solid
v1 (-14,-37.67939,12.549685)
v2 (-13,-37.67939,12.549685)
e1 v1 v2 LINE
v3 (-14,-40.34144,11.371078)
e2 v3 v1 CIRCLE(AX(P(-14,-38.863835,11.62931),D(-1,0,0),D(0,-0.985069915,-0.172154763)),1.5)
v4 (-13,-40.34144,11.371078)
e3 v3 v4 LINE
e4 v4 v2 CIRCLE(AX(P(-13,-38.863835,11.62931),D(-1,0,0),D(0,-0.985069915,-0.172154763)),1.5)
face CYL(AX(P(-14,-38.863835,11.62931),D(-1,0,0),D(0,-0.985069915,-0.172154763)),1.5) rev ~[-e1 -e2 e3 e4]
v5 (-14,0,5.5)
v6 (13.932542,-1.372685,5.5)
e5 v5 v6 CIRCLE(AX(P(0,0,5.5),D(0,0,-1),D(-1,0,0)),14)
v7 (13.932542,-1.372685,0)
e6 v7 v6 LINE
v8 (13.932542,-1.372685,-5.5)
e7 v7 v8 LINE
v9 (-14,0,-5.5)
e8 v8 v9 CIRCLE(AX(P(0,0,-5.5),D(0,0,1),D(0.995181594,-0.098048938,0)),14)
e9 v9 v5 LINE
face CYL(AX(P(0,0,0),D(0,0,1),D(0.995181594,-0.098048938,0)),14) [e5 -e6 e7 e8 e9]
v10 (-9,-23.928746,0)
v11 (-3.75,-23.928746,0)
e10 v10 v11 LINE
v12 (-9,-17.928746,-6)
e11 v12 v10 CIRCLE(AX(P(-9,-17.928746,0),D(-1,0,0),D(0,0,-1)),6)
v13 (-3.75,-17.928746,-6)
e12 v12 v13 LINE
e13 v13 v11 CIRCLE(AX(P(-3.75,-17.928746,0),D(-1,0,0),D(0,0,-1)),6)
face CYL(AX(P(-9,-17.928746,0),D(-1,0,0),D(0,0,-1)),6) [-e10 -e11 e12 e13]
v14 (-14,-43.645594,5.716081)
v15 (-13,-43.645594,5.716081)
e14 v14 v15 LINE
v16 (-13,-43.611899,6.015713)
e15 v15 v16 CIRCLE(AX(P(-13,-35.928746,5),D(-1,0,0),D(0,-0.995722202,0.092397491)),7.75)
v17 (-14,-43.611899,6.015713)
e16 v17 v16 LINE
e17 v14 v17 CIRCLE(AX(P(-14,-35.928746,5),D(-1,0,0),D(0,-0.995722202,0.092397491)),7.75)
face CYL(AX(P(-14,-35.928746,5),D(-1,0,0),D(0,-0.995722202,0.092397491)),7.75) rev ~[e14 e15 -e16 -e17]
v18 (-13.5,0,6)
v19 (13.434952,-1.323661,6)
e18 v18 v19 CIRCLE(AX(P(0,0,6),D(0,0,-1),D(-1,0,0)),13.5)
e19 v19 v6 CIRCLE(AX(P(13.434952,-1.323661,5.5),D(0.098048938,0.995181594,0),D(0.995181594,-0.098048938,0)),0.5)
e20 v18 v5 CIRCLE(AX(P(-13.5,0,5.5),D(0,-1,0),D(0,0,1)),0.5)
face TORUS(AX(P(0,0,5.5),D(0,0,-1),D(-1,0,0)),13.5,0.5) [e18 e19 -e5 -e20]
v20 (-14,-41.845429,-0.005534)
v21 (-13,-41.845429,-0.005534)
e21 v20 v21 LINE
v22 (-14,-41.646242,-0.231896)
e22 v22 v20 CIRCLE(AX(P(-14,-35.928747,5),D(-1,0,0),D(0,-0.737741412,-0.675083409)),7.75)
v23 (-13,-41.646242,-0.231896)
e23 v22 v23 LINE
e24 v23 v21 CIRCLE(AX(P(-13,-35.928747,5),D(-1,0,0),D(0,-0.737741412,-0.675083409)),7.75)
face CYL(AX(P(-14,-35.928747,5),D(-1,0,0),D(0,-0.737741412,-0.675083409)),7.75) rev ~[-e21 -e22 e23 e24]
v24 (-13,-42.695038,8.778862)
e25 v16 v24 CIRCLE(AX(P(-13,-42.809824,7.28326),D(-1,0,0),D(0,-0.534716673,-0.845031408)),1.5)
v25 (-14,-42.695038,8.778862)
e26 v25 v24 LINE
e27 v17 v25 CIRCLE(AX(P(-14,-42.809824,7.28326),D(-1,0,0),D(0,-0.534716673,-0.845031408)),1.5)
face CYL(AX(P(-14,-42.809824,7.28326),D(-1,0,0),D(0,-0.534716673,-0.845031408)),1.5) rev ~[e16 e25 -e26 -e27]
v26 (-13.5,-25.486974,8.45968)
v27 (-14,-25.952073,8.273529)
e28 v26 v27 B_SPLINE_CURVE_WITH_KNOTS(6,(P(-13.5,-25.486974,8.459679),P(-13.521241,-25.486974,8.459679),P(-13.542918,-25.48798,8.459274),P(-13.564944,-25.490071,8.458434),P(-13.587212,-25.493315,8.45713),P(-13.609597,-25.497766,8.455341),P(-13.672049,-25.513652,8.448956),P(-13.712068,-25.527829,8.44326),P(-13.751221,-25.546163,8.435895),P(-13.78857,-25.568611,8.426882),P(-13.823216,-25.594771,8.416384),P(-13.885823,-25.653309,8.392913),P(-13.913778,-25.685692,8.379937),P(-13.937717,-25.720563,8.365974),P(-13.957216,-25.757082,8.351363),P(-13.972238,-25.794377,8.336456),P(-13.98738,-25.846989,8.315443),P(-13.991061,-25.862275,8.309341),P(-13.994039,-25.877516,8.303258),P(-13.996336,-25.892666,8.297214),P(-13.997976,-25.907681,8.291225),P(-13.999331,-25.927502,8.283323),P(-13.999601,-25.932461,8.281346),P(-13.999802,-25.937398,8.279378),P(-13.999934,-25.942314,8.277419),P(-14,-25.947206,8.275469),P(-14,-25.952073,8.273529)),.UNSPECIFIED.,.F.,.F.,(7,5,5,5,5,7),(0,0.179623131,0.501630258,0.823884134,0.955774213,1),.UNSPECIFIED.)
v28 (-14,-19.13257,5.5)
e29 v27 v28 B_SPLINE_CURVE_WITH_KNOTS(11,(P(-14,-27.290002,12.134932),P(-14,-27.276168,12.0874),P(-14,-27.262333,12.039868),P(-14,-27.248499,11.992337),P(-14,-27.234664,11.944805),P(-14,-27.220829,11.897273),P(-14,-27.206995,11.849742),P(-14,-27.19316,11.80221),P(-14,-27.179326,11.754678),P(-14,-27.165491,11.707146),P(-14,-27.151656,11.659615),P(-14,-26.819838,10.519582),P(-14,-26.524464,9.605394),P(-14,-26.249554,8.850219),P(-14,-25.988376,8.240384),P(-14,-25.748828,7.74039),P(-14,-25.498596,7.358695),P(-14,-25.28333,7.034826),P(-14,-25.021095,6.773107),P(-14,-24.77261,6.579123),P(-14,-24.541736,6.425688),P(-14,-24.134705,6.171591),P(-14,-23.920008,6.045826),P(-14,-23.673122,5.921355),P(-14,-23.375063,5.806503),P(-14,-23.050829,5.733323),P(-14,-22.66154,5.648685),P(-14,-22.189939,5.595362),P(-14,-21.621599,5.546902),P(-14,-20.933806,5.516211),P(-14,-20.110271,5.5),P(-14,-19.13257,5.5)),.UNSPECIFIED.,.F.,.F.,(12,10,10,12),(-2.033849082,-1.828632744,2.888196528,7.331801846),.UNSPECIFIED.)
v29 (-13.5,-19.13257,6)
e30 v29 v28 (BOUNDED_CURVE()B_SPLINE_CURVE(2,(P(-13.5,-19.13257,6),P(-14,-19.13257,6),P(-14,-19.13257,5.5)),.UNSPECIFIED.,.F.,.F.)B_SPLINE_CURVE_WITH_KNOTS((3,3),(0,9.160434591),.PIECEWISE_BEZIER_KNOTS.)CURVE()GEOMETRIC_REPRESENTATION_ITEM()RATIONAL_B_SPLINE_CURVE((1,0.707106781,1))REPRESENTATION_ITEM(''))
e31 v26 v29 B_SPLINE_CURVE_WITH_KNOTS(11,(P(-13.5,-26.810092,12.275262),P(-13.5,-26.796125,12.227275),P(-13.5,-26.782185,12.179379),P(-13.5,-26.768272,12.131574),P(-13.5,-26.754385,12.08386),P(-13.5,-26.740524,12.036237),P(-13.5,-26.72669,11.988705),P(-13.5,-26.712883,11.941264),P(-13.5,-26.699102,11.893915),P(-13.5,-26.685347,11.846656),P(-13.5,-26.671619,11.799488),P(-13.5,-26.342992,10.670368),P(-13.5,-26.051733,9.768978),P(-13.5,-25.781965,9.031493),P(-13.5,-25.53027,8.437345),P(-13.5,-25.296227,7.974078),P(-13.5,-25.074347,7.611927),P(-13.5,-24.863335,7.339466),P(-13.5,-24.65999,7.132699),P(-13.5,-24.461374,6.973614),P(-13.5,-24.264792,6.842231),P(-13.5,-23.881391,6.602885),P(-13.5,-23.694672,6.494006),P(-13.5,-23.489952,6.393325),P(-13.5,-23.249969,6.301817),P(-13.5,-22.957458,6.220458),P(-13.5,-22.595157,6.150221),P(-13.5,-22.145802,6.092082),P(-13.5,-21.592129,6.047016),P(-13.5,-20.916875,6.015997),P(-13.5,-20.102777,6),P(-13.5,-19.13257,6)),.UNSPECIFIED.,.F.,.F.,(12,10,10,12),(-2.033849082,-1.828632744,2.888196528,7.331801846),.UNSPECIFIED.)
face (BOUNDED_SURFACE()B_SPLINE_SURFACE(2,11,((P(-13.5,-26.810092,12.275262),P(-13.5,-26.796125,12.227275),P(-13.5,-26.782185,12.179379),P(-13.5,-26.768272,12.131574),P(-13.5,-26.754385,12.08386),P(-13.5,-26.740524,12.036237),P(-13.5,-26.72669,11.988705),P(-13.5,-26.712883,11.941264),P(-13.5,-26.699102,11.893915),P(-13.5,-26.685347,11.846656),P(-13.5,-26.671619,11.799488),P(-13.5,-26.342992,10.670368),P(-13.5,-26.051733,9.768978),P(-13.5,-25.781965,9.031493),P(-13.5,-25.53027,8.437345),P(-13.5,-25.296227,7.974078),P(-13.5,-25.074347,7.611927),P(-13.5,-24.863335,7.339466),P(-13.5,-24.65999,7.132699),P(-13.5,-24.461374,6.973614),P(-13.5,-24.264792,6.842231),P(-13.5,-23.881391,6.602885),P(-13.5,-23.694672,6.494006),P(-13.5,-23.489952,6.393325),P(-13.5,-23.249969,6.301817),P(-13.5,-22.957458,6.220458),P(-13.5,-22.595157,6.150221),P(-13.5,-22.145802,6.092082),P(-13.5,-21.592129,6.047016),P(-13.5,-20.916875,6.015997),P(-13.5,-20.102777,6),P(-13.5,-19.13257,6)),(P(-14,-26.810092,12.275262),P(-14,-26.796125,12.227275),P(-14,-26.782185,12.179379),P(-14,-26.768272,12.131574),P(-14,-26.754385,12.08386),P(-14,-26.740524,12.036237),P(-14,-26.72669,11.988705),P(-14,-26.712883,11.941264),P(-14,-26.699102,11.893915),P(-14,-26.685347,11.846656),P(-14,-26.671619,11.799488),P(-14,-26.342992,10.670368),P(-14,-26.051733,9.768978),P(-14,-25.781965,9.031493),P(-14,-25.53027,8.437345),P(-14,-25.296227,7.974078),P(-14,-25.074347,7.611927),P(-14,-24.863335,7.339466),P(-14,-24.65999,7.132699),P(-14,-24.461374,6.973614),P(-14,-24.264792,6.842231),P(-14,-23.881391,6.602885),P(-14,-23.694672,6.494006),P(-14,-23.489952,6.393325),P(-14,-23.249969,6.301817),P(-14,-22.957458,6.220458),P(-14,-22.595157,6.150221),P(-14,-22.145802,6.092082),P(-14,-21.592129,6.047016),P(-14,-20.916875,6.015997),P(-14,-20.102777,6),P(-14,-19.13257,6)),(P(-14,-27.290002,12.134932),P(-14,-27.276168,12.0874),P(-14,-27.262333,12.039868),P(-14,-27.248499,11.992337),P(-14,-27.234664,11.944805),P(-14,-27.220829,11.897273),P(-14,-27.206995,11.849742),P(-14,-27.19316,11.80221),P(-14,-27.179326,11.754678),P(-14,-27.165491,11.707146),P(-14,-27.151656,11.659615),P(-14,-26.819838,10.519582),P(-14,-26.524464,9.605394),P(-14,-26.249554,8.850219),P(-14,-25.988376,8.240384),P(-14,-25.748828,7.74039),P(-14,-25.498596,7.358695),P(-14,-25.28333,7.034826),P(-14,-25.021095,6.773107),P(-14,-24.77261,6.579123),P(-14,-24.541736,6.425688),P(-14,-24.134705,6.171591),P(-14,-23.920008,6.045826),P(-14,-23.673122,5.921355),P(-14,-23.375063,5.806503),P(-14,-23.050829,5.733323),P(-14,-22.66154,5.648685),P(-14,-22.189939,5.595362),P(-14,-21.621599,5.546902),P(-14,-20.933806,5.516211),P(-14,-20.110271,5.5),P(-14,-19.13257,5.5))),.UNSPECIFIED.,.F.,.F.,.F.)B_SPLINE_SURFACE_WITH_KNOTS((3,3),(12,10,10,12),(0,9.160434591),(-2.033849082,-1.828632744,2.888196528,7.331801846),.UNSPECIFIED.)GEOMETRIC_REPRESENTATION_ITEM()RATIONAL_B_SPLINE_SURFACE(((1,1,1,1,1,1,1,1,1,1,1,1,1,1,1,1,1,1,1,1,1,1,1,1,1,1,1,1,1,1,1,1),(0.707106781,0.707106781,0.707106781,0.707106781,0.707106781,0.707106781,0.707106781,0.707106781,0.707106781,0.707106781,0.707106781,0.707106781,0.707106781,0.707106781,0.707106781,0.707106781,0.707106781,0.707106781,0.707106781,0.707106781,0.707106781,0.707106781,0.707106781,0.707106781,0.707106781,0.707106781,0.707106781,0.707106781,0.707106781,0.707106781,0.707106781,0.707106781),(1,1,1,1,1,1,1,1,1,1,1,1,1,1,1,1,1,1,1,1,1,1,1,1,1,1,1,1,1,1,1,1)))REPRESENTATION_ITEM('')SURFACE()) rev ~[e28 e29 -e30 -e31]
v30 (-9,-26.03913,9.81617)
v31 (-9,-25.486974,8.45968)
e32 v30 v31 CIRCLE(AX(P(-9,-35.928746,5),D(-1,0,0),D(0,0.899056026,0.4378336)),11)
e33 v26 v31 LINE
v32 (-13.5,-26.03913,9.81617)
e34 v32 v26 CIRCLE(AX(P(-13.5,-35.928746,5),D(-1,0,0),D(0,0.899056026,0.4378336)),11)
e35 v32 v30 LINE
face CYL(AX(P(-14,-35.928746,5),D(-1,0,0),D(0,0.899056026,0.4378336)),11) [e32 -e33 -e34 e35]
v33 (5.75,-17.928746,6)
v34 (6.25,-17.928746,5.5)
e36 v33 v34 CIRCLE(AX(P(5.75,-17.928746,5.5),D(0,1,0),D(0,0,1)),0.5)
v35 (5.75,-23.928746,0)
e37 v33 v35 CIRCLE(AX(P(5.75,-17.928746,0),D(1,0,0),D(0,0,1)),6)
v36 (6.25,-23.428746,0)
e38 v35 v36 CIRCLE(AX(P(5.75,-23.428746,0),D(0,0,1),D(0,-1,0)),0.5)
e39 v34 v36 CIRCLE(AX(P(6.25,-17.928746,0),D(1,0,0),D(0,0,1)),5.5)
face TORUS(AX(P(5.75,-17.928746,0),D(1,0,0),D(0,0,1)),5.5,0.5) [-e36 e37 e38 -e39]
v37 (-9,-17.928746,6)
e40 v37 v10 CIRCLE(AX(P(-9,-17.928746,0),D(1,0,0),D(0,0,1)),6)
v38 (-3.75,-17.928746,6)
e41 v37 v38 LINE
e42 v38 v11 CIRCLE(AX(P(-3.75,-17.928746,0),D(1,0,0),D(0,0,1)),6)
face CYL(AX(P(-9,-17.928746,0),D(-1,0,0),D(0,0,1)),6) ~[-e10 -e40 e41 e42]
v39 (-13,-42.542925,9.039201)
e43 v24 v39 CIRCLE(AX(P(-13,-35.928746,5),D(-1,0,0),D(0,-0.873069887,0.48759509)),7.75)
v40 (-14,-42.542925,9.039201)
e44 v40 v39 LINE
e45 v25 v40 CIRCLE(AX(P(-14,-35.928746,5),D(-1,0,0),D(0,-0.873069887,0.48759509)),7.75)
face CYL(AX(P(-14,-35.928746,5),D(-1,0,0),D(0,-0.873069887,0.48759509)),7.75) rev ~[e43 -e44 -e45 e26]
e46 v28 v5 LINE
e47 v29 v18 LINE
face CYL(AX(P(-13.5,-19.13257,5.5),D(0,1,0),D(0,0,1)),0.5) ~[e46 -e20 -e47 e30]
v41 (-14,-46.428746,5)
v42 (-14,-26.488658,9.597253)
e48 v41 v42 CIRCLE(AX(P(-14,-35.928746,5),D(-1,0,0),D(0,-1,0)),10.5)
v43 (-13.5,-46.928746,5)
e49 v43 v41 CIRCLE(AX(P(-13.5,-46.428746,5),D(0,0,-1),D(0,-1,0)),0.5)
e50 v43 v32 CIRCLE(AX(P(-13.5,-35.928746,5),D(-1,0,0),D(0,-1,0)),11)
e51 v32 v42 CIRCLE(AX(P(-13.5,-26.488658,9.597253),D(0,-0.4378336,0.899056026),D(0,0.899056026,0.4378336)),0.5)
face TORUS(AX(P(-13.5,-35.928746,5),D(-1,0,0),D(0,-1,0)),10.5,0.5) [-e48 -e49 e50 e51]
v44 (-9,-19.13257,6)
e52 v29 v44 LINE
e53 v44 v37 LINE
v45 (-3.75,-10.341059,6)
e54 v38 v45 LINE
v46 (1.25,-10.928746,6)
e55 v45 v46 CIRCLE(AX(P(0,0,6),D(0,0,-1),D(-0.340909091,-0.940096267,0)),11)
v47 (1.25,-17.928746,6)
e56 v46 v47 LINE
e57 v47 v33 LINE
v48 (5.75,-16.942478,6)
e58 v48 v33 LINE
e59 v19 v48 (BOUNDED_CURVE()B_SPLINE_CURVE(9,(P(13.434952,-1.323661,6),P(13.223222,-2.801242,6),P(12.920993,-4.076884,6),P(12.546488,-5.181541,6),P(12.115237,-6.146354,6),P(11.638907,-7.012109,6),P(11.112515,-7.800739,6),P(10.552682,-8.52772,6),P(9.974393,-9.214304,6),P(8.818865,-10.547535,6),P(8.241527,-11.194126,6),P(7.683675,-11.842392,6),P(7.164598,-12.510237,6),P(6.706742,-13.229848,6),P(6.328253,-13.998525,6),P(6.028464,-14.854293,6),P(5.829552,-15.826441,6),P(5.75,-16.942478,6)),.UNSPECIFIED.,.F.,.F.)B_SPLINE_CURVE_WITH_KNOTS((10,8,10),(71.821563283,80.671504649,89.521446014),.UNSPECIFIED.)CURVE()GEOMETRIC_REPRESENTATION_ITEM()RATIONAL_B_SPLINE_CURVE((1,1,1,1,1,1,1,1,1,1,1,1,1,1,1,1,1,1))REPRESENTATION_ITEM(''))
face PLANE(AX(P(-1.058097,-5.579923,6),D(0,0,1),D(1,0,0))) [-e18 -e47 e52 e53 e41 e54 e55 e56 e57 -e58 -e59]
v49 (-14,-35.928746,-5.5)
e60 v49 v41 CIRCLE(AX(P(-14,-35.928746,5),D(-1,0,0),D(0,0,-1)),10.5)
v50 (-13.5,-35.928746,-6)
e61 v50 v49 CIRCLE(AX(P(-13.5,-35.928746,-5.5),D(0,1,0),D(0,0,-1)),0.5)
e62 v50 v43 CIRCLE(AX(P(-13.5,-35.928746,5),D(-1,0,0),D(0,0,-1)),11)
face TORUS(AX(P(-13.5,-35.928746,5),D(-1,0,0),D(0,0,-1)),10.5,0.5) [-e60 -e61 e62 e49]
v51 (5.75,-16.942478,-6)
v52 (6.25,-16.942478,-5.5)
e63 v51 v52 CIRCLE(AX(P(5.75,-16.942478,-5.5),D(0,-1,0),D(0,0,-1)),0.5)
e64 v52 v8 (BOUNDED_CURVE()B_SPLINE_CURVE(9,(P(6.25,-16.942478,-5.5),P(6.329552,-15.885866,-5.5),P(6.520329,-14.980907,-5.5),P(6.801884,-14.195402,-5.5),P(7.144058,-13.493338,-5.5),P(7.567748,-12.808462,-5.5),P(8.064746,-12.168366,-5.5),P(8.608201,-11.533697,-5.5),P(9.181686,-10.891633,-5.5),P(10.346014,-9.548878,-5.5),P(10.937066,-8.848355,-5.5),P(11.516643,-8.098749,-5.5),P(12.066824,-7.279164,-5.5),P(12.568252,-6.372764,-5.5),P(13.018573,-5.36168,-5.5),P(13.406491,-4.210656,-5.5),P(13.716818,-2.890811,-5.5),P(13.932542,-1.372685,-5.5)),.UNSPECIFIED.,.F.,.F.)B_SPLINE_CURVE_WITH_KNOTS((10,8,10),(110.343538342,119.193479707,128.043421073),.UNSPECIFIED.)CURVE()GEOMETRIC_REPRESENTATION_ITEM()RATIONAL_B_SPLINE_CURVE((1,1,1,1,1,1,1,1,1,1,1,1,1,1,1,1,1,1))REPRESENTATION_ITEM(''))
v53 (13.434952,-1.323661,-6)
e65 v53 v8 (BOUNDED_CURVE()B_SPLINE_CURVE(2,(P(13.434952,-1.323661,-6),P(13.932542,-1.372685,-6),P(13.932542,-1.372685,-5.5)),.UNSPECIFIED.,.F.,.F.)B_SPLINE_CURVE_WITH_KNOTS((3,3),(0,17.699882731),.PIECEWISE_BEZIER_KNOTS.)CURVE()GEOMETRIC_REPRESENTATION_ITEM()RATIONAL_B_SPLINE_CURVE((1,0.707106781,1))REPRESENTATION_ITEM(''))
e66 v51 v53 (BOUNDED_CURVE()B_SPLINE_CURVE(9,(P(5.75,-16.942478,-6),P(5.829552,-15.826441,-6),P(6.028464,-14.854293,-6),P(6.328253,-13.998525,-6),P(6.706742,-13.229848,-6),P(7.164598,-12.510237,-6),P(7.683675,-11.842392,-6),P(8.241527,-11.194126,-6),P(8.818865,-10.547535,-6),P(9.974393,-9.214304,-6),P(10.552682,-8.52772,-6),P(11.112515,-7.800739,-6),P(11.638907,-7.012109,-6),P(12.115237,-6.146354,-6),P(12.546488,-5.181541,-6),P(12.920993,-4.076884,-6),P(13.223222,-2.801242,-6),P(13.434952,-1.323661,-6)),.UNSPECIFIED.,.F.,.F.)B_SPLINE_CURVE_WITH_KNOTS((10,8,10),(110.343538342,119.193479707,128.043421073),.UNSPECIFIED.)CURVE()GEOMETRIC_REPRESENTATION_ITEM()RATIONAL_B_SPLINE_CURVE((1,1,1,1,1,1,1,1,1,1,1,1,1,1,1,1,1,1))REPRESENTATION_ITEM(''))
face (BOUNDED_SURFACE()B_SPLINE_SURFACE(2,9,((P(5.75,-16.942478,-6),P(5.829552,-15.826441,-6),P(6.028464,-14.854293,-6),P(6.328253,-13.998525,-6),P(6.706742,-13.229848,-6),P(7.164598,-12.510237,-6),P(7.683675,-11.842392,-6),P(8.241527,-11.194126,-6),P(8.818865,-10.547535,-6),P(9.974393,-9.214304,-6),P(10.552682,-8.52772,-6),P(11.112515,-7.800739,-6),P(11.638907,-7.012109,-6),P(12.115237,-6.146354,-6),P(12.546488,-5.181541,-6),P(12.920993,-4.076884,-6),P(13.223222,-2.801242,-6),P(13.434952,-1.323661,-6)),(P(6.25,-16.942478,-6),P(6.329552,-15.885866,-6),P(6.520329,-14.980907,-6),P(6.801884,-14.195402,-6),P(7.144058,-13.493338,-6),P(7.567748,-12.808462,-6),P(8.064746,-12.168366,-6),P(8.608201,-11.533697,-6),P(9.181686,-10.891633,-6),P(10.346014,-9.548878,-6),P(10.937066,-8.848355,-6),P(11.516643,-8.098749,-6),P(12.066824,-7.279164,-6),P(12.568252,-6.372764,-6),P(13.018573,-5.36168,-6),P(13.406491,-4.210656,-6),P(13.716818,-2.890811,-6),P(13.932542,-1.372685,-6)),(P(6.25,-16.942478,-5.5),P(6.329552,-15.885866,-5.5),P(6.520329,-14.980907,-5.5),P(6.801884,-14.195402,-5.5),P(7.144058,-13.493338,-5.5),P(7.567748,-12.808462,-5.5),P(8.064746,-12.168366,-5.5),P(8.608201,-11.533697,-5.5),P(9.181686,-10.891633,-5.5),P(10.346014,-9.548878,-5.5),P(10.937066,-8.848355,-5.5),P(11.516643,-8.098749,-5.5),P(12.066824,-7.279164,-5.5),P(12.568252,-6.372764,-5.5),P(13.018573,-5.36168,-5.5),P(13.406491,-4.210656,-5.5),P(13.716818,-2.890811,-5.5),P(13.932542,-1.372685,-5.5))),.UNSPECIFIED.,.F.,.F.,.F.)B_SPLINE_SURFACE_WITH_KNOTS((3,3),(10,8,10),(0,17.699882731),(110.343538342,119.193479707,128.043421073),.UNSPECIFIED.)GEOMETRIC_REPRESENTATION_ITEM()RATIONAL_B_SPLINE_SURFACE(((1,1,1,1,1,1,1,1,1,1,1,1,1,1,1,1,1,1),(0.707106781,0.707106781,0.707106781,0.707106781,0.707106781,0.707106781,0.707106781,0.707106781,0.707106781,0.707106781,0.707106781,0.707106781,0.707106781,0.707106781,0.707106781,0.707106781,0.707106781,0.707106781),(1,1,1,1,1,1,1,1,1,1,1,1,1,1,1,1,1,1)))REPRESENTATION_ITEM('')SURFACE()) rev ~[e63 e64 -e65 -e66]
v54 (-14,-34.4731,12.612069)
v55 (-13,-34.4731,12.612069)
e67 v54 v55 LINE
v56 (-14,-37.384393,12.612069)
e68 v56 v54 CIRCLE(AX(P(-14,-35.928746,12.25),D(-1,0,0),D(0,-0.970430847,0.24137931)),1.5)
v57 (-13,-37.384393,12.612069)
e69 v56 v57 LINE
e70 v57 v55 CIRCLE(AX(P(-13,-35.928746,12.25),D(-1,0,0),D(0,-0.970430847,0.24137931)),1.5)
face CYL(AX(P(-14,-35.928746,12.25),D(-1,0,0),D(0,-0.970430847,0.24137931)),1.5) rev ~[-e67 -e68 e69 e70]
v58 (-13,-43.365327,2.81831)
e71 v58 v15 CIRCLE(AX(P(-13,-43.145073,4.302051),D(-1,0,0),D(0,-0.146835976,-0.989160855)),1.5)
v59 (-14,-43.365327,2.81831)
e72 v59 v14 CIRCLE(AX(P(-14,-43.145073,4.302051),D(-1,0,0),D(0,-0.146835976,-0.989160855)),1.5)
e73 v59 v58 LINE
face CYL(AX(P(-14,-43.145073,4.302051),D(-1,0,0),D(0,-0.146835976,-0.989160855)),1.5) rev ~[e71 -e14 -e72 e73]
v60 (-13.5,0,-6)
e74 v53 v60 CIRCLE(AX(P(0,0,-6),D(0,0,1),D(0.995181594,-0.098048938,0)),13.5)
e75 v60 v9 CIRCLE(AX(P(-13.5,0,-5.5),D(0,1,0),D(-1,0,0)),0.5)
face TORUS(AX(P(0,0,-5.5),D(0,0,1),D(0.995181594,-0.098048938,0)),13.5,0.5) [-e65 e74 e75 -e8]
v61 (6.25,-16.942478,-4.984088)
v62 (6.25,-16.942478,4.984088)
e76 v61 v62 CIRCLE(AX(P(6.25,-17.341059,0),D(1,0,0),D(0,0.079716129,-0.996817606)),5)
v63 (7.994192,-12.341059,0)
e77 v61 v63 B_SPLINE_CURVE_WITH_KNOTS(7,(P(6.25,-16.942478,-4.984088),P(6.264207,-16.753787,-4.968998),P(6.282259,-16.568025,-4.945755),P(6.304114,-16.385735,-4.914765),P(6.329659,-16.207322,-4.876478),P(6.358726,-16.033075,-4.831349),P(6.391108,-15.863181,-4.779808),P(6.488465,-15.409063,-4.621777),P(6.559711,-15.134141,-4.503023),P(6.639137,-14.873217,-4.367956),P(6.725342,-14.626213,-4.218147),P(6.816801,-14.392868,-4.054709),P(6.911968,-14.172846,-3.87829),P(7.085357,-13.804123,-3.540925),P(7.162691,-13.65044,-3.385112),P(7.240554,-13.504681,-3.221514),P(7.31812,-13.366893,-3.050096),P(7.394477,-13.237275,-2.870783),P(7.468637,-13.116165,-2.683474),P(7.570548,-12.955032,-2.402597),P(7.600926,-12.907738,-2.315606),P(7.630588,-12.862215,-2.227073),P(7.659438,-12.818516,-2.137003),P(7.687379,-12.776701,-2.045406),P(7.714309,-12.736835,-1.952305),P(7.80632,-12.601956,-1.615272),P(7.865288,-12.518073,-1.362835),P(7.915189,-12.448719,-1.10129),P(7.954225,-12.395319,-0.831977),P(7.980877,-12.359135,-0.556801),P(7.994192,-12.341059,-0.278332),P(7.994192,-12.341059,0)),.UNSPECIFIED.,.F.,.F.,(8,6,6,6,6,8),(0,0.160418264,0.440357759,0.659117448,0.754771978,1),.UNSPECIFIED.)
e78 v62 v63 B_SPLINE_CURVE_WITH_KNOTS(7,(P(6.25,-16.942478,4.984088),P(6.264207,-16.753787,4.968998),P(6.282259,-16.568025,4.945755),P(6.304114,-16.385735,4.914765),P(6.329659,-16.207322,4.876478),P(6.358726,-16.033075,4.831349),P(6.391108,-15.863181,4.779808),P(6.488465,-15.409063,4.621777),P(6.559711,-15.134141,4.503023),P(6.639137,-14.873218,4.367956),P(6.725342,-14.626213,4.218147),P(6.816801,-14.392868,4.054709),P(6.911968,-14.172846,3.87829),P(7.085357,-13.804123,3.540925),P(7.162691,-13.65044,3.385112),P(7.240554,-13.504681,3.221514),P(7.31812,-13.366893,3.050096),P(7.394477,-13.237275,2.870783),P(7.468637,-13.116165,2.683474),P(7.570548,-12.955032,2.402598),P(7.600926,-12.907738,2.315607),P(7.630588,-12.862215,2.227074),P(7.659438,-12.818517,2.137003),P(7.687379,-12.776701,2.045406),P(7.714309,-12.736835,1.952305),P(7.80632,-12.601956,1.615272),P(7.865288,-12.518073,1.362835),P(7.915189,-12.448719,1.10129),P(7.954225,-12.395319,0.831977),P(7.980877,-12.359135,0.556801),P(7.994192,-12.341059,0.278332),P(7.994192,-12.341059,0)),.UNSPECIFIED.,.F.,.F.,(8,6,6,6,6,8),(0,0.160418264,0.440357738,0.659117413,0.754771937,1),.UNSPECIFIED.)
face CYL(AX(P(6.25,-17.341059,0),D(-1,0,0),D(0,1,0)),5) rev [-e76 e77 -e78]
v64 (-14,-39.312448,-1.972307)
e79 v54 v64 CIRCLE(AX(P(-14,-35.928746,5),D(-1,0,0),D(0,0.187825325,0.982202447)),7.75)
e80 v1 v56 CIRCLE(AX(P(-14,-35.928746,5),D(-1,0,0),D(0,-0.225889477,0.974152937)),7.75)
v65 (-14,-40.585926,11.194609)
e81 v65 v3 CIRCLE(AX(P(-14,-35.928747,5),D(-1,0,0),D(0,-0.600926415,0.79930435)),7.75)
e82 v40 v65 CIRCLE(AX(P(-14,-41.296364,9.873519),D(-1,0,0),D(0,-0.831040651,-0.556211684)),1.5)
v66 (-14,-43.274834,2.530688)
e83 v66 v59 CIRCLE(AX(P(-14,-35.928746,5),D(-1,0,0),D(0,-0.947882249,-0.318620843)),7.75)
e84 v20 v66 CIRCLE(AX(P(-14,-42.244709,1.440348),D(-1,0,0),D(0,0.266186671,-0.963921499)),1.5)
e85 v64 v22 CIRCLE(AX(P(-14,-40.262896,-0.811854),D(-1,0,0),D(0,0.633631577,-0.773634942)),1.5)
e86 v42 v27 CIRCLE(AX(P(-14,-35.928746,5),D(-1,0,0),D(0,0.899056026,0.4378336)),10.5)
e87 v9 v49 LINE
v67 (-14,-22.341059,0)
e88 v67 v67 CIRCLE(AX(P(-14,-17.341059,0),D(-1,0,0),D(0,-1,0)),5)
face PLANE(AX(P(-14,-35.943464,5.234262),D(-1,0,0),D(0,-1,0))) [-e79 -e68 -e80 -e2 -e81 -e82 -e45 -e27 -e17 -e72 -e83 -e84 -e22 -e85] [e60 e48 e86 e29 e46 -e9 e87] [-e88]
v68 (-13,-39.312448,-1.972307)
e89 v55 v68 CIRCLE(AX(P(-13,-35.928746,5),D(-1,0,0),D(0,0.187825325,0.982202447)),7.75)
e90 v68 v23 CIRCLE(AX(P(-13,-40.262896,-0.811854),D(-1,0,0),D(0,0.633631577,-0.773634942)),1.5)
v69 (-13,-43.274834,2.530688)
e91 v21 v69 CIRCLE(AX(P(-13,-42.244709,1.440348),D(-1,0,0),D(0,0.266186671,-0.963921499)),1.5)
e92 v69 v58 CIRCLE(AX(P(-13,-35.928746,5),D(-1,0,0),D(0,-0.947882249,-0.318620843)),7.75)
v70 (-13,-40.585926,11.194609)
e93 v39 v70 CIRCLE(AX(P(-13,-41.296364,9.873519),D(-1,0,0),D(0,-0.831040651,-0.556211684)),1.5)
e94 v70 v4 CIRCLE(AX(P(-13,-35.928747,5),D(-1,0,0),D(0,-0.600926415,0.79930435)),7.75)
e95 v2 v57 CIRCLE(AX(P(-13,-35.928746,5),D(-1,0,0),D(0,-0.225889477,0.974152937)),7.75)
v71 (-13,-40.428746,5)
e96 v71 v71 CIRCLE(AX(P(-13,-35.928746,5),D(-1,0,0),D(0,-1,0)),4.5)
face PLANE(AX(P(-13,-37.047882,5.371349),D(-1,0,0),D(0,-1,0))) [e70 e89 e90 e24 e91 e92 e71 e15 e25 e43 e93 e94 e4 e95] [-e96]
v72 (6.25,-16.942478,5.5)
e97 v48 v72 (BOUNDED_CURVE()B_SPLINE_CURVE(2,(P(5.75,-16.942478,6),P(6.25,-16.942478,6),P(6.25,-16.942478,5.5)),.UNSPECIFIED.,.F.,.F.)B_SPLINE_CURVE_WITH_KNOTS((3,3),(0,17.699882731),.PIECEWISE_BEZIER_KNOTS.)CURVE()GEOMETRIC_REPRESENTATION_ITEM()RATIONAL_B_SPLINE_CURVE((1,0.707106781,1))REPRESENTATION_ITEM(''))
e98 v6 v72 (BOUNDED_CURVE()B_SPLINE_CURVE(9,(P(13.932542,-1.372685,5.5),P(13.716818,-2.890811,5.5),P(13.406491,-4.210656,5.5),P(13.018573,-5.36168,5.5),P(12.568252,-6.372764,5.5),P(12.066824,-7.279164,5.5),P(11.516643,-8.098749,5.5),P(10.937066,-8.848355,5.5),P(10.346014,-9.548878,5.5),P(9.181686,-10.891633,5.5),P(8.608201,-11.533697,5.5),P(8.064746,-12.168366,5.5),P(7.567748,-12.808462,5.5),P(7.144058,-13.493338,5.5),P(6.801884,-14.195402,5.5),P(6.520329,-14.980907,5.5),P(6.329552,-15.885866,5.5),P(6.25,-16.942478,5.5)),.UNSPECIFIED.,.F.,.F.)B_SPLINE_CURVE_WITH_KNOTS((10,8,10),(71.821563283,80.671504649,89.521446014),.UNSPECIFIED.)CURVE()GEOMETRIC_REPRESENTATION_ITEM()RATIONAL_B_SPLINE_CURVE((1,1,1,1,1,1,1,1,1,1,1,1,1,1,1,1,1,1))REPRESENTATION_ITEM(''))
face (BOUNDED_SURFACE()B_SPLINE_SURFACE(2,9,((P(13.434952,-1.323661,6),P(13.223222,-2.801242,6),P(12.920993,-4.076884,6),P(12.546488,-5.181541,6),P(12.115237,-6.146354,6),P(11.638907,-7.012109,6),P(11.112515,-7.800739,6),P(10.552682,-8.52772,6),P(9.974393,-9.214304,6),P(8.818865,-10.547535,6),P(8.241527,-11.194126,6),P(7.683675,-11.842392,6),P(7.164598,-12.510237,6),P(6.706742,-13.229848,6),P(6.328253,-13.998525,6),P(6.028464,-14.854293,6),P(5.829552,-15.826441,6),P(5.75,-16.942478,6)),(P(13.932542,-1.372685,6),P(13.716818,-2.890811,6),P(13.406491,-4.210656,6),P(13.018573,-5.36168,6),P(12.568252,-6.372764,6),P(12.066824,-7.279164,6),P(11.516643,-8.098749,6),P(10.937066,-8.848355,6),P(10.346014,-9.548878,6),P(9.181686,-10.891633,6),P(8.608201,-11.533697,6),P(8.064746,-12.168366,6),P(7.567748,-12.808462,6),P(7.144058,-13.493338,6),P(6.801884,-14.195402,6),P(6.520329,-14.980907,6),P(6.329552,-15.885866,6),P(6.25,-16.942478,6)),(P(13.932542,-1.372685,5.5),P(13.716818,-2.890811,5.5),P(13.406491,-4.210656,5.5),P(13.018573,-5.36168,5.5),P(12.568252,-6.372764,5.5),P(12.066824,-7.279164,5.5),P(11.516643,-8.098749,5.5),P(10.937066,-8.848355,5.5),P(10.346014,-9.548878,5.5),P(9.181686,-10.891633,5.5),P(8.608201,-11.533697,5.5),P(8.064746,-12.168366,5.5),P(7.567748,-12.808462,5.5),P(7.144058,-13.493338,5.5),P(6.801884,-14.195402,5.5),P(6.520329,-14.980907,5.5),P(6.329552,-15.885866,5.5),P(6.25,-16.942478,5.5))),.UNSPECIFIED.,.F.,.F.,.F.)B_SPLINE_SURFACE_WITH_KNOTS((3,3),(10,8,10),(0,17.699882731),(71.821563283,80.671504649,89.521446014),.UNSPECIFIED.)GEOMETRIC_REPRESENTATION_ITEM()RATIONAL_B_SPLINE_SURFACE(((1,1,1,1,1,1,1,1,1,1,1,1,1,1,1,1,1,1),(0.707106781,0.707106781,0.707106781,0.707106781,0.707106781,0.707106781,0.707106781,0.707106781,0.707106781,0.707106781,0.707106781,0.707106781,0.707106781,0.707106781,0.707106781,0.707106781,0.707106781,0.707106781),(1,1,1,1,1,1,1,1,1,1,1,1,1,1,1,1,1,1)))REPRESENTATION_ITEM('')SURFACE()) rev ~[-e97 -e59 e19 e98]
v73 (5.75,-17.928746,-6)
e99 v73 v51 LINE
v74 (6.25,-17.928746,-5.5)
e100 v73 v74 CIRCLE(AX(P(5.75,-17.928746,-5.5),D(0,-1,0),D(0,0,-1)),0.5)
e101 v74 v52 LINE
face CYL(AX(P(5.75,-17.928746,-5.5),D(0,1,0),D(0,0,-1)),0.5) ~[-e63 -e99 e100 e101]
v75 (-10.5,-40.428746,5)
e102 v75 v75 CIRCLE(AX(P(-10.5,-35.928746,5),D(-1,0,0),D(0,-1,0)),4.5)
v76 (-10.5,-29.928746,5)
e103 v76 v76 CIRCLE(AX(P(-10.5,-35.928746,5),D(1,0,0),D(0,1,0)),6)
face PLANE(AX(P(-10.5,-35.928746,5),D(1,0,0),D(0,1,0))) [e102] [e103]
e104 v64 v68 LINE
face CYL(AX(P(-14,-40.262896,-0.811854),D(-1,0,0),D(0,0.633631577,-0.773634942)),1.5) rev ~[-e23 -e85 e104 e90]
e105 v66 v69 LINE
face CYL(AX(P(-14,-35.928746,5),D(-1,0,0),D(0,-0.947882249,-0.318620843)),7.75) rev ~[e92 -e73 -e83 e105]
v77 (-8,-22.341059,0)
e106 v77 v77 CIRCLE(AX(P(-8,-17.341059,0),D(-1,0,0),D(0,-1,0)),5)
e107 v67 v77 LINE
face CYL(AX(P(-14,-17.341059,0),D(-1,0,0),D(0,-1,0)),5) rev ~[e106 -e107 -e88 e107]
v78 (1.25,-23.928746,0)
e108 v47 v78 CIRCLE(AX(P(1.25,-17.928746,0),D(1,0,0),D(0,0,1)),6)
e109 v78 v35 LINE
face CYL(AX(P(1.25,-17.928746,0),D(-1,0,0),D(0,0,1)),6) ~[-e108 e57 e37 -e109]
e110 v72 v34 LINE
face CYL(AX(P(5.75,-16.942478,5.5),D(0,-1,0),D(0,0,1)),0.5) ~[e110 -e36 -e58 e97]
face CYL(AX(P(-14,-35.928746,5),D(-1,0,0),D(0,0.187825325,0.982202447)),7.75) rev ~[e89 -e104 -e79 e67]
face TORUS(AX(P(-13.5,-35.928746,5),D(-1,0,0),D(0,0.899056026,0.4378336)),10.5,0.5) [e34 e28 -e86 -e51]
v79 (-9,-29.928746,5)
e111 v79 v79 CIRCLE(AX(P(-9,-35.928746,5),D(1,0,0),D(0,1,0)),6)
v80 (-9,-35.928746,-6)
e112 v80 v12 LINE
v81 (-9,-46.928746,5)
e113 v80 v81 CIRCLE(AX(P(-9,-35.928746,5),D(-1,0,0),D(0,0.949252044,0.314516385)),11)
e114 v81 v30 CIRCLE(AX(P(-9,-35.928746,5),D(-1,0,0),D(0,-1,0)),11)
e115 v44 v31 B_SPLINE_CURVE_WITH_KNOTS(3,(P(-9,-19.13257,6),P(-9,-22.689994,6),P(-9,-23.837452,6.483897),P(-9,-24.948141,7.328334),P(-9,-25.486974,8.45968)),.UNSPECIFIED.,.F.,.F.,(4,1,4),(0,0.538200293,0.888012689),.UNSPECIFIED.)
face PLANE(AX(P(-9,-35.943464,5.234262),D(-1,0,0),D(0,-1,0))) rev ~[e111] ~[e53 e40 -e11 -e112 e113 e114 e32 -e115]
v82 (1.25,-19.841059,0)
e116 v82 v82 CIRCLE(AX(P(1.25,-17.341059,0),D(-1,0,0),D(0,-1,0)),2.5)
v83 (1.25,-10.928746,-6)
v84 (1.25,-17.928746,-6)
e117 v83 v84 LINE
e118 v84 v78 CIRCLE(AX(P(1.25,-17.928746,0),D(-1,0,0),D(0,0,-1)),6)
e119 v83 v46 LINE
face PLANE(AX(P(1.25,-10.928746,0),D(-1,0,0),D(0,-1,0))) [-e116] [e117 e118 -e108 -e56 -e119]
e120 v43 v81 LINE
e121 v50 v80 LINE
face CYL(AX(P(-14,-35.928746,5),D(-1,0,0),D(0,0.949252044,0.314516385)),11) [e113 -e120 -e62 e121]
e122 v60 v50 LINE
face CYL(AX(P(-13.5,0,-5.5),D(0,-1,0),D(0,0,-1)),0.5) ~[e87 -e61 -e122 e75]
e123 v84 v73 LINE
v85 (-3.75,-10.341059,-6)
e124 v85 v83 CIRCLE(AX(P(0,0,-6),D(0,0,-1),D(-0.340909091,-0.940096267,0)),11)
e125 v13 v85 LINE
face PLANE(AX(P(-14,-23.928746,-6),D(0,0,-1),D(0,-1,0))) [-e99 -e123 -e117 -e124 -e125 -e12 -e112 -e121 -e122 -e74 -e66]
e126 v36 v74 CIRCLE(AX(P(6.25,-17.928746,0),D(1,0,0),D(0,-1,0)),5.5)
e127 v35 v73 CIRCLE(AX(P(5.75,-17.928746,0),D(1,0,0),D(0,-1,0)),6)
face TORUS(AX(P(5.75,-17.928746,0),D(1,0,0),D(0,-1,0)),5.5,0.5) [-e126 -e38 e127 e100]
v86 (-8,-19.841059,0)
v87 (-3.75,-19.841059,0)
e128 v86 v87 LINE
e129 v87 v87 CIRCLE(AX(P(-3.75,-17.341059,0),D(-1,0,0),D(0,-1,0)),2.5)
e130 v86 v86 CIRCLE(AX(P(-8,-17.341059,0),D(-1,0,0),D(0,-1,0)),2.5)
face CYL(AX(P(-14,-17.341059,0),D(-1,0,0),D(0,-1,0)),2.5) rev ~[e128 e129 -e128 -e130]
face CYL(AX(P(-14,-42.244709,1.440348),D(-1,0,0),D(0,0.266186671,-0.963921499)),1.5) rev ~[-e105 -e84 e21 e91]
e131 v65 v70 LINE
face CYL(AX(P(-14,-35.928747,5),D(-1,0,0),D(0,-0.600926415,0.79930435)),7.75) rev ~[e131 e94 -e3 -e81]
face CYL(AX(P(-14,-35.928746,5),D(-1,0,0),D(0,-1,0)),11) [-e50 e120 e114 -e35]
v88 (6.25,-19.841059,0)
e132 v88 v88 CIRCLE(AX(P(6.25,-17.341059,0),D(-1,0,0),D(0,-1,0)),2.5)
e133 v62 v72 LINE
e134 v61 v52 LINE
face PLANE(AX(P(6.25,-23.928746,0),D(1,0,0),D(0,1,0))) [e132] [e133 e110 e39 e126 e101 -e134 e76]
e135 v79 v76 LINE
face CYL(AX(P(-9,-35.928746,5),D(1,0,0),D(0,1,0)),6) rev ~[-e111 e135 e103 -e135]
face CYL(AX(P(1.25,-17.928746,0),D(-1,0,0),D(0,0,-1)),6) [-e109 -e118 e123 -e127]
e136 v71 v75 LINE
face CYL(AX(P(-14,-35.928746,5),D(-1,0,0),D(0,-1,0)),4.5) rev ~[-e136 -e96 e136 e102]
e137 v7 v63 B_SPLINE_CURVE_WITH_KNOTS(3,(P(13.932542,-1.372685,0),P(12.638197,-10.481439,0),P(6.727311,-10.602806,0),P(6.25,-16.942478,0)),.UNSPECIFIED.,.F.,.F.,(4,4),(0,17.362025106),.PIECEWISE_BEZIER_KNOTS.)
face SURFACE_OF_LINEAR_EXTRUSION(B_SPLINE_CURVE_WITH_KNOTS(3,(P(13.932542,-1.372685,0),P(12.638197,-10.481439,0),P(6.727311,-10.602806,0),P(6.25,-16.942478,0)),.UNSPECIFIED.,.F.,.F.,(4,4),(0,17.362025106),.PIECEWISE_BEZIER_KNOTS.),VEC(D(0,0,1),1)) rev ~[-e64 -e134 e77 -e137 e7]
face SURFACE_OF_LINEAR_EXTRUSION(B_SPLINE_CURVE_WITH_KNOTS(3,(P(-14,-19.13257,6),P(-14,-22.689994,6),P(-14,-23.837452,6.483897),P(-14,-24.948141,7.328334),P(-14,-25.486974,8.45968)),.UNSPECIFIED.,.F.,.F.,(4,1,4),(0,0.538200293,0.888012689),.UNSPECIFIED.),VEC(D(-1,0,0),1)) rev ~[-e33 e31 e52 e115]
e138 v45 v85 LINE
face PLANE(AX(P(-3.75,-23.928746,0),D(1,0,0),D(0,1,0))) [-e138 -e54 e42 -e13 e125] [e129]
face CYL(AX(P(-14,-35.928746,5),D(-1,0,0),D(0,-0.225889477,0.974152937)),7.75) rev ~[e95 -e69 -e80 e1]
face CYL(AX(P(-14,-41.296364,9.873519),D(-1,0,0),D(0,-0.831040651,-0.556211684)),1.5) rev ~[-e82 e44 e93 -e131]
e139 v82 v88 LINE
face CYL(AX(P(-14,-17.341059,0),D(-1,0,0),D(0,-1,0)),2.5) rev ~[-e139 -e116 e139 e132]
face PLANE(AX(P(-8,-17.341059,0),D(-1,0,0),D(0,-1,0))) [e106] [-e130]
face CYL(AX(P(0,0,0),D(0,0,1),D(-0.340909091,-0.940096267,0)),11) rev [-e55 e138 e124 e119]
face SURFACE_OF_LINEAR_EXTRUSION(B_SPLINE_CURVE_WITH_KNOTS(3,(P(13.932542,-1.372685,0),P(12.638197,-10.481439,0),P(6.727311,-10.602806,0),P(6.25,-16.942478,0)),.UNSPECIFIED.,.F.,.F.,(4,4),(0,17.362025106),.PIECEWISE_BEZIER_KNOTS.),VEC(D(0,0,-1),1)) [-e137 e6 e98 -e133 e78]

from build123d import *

# Parameters (mm, degrees)
F1_DEPTH     = 6
F3_DEPTH     = 5
F4_R         = 2.5
F5_DEPTH     = 28.0010001
F4_R_2       = 5
F6_DEPTH     = 6
F7_R         = 5
F8_DEPTH     = 7.7510001
F9_R         = 4.5
F10_DEPTH    = 1
F11_DEPTH    = 28.0010001
F12_T1_DEPTH = 5
F12_T3_DEPTH = 5.25
F13_R        = 0.5
F14_R        = 6
F14_R_2      = 4.5
F15_DEPTH    = 1.5


# Not quite as in the source:
# - a fillet or chamfer that OpenCascade refuses, or shapes differently, is made with other operations: its cross-section is extruded or revolved along the edge and cut away or added
# - a feature names something its author has since deleted; it is built from what else it names


with BuildPart() as f1:
    # F0 (on Top) → F1 (new body, symmetric)
    with BuildSketch(Plane.XY):
        with BuildLine():
            ThreePointArc((-3.75, -10.34105894), (1.2840732714, 10.9247954596), (1.25, -10.9287464972))
            Line((1.25, -10.9287464972), (1.25, -23.9287464972))
            Line((1.25, -23.9287464972), (6.25, -23.9287464972))
            Line((6.25, -23.9287464972), (6.25, -16.9424782941))
            add(Edge.make_bspline(
                [(13.9325423216, -1.3726851266), (12.6381972805, -10.4814385995), (6.7273111737, -10.6028057635), (6.25, -16.9424782941)],
                knots=[0, 0, 0, 0, 17.3620251065, 17.3620251065, 17.3620251065, 17.3620251065], degree=3))
            ThreePointArc((13.9325423216, -1.3726851266), (0.6871708294, 13.9831254107), (-14, 0))
            Line((-14, 0), (-14, -23.9287464972))
            Line((-14, -23.9287464972), (-3.75, -23.9287464972))
            Line((-3.75, -23.9287464972), (-3.75, -10.34105894))
        make_face()
    extrude(amount=F1_DEPTH, both=True)

    # F2 (on face) → F3 (join)
    with BuildSketch(Plane(origin=(-14, 0, 0), x_dir=(0, -1, 0), z_dir=(-1, 0, 0))):
        with BuildLine():
            ThreePointArc((35.9287464972, -6), (43.7069210902, -2.7781745931), (46.9287464972, 5))
            ThreePointArc((46.9287464972, 5), (38.4000033429, 15.7188100833), (26.0391302058, 9.8161695992))
            add(Edge.make_bspline(
                [(25.4869740085, 8.4596802299), (25.6594735822, 8.8218641875), (25.8423553432, 9.2659041852), (26.0391302058, 9.8161695992)],
                knots=[0.8880126886, 0.8880126886, 0.8880126886, 0.8880126886, 1, 1, 1, 1], degree=3))
            ThreePointArc((25.4869740085, 8.4596802299), (27.0108856963, -1.4398570431), (35.9287464972, -6))
        make_face()
        with BuildLine():
            add(Edge.make_bspline(
                [(25.4869740085, 8.4596802299), (25.6594735822, 8.8218641875), (25.8423553432, 9.2659041852), (26.0391302058, 9.8161695992)],
                knots=[0.8880126886, 0.8880126886, 0.8880126886, 0.8880126886, 1, 1, 1, 1], degree=3))
            ThreePointArc((26.0391302058, 9.8161695992), (25.7404513363, 9.1471245117), (25.4869740085, 8.4596802299))
        make_face()
        with BuildLine():
            Line((23.9287464972, 6), (23.9287464972, -6))
            Line((23.9287464972, -6), (35.9287464972, -6))
            ThreePointArc((35.9287464972, -6), (27.0108856963, -1.4398570431), (25.4869740085, 8.4596802299))
            add(Edge.make_bspline(
                [(19.1325701837, 6), (22.6899938416, 6), (23.8374523242, 6.4838968901), (24.9481407399, 7.3283338654), (25.4869740085, 8.4596802299)],
                knots=[0, 0, 0, 0, 0.5382002935, 0.8880126886, 0.8880126886, 0.8880126886, 0.8880126886], degree=3))
            Line((19.1325701837, 6), (23.9287464972, 6))
        make_face()
    extrude(amount=-F3_DEPTH)

    # F4 (on face) → F5 (cut, through all)
    with BuildSketch(Plane(origin=(-14, 0, 0), x_dir=(0, -1, 0), z_dir=(-1, 0, 0))):
        with Locations((17.34105894, 0)):
            Circle(F4_R)
    extrude(amount=-F5_DEPTH, mode=Mode.SUBTRACT)

    # F4 (on face) → F6 (cut)
    with BuildSketch(Plane(origin=(-14, 0, 0), x_dir=(0, -1, 0), z_dir=(-1, 0, 0))):
        with Locations((17.34105894, 0)):
            Circle(F4_R_2)
        with Locations((17.34105894, 0)):
            Circle(F4_R, mode=Mode.SUBTRACT)
    extrude(amount=-F6_DEPTH, mode=Mode.SUBTRACT)

    # F7 (on face) → F8 (cut, through all)
    with BuildSketch(Plane.YZ.offset(6.25)):
        with Locations((-17.34105894, 0)):
            Circle(F7_R)
    extrude(amount=F8_DEPTH, mode=Mode.SUBTRACT)

    # F9 (on face) → F10 (cut)
    with BuildSketch(Plane(origin=(-14, 0, 0), x_dir=(0, -1, 0), z_dir=(-1, 0, 0))):
        with BuildLine():
            ThreePointArc((34.4731002269, 12.6120689655), (28.5731123295, 2.5592734708), (39.3124481602, -1.9723068676))
            ThreePointArc((39.3124481602, -1.9723068676), (41.159616015, -2.0143070996), (41.6462424386, -0.231896421))
            ThreePointArc((41.6462424386, -0.231896421), (41.7469365287, -0.1196840486), (41.8454286992, -0.0055341094))
            ThreePointArc((41.8454286992, -0.0055341094), (43.5514595083, 0.7038684435), (43.2748339282, 2.5306884652))
            ThreePointArc((43.2748339282, 2.5306884652), (43.3214793257, 2.6740590451), (43.3653269111, 2.8183098875))
            ThreePointArc((43.3653269111, 2.8183098875), (44.6381060055, 4.1576479629), (43.6455935628, 5.7160805584))
            ThreePointArc((43.6455935628, 5.7160805584), (43.6302034221, 5.8660607565), (43.6118986313, 6.0157131902))
            ThreePointArc((43.6118986313, 6.0157131902), (44.2334947511, 7.7556589846), (42.6950381231, 8.7788619494))
            ThreePointArc((42.6950381231, 8.7788619494), (42.6202476169, 8.9097714466), (42.5429246828, 9.0392012737))
            ThreePointArc((42.5429246828, 9.0392012737), (42.4069051987, 10.8818330338), (40.58592621, 11.1946087142))
            ThreePointArc((40.58592621, 11.1946087142), (40.4645413227, 11.2840325668), (40.341439844, 11.3710781997))
            ThreePointArc((40.341439844, 11.3710781997), (39.4710946558, 13.0008917955), (37.6793899466, 12.5496852592))
            ThreePointArc((37.6793899466, 12.5496852592), (37.5321947731, 12.5823118919), (37.3843927675, 12.6120689655))
            ThreePointArc((37.3843927675, 12.6120689655), (35.9287464972, 13.75), (34.4731002269, 12.6120689655))
        make_face()
        with Locations((35.9287464972, 5)):
            Circle(F9_R, mode=Mode.SUBTRACT)
    extrude(amount=-F10_DEPTH, mode=Mode.SUBTRACT)

    # F11 (cut, through all): a face of the model
    f11_faces = [f1.faces().sort_by_distance(p)[0] for p in [
        (-14, -35.9287464972, 5),
    ]]
    extrude(f11_faces, amount=-F11_DEPTH, mode=Mode.SUBTRACT)

    # F12: fillet of radius 6 on 4 edges, made by hand

    # F12_s2 → F12_t1 (cut)
    with BuildSketch(Plane.YZ.offset(1.25)):
        with BuildLine():
            ThreePointArc((-17.9287464972, -6), (-22.1713871843, -4.2426406871), (-23.9287464972, 0))
            Line((-23.9287464972, 0), (-24.0487464972, 0))
            Line((-24.0487464972, 0), (-24.0487464972, -6.12))
            Line((-24.0487464972, -6.12), (-17.9287464972, -6.12))
            Line((-17.9287464972, -6.12), (-17.9287464972, -6))
        make_face()
        with BuildLine():
            ThreePointArc((-17.9287464972, 6), (-22.1713871843, 4.2426406871), (-23.9287464972, 0))
            Line((-23.9287464972, 0), (-24.0487464972, 0))
            Line((-24.0487464972, 0), (-24.0487464972, 6.12))
            Line((-24.0487464972, 6.12), (-17.9287464972, 6.12))
            Line((-17.9287464972, 6.12), (-17.9287464972, 6))
        make_face()
    extrude(amount=F12_T1_DEPTH, mode=Mode.SUBTRACT)

    # F12_s4 → F12_t3 (cut)
    with BuildSketch(Plane.YZ.offset(-9)):
        with BuildLine():
            ThreePointArc((-17.9287464972, -6), (-22.1713871843, -4.2426406871), (-23.9287464972, 0))
            Line((-23.9287464972, 0), (-24.0487464972, 0))
            Line((-24.0487464972, 0), (-24.0487464972, -6.12))
            Line((-24.0487464972, -6.12), (-17.9287464972, -6.12))
            Line((-17.9287464972, -6.12), (-17.9287464972, -6))
        make_face()
        with BuildLine():
            ThreePointArc((-17.9287464972, 6), (-22.1713871843, 4.2426406871), (-23.9287464972, 0))
            Line((-23.9287464972, 0), (-24.0487464972, 0))
            Line((-24.0487464972, 0), (-24.0487464972, 6.12))
            Line((-24.0487464972, 6.12), (-17.9287464972, 6.12))
            Line((-17.9287464972, 6.12), (-17.9287464972, 6))
        make_face()
    extrude(amount=F12_T3_DEPTH, mode=Mode.SUBTRACT)

    # F13
    f13_edges = [f1.edges().sort_by_distance(p)[0] for p in [
        (6.25, -22.171387, 4.242641),
        (6.25, -17.435612, -6),
        (10.470288, -9.384464, -6),
        (6.25, -17.435612, 6),
        (10.470288, -9.384464, 6),
        (0.687171, 13.983125, -6),
        (0.687171, 13.983125, 6),
        (-14, -17.964373, -6),
        (-14, -44.846607, 11.439857),
        (-14, -22.786929, 6.220362),
        (-14, -9.566285, 6),
    ]]
    fillet(f13_edges, radius=F13_R)

    # F14 (on face) → F15 (cut)
    with BuildSketch(Plane.YZ.offset(-9)):
        with Locations((-35.9287464972, 5)):
            Circle(F14_R)
        with Locations((-35.9287464972, 5)):
            Circle(F14_R_2, mode=Mode.SUBTRACT)
    extrude(amount=-F15_DEPTH, mode=Mode.SUBTRACT)


solid = f1.part
